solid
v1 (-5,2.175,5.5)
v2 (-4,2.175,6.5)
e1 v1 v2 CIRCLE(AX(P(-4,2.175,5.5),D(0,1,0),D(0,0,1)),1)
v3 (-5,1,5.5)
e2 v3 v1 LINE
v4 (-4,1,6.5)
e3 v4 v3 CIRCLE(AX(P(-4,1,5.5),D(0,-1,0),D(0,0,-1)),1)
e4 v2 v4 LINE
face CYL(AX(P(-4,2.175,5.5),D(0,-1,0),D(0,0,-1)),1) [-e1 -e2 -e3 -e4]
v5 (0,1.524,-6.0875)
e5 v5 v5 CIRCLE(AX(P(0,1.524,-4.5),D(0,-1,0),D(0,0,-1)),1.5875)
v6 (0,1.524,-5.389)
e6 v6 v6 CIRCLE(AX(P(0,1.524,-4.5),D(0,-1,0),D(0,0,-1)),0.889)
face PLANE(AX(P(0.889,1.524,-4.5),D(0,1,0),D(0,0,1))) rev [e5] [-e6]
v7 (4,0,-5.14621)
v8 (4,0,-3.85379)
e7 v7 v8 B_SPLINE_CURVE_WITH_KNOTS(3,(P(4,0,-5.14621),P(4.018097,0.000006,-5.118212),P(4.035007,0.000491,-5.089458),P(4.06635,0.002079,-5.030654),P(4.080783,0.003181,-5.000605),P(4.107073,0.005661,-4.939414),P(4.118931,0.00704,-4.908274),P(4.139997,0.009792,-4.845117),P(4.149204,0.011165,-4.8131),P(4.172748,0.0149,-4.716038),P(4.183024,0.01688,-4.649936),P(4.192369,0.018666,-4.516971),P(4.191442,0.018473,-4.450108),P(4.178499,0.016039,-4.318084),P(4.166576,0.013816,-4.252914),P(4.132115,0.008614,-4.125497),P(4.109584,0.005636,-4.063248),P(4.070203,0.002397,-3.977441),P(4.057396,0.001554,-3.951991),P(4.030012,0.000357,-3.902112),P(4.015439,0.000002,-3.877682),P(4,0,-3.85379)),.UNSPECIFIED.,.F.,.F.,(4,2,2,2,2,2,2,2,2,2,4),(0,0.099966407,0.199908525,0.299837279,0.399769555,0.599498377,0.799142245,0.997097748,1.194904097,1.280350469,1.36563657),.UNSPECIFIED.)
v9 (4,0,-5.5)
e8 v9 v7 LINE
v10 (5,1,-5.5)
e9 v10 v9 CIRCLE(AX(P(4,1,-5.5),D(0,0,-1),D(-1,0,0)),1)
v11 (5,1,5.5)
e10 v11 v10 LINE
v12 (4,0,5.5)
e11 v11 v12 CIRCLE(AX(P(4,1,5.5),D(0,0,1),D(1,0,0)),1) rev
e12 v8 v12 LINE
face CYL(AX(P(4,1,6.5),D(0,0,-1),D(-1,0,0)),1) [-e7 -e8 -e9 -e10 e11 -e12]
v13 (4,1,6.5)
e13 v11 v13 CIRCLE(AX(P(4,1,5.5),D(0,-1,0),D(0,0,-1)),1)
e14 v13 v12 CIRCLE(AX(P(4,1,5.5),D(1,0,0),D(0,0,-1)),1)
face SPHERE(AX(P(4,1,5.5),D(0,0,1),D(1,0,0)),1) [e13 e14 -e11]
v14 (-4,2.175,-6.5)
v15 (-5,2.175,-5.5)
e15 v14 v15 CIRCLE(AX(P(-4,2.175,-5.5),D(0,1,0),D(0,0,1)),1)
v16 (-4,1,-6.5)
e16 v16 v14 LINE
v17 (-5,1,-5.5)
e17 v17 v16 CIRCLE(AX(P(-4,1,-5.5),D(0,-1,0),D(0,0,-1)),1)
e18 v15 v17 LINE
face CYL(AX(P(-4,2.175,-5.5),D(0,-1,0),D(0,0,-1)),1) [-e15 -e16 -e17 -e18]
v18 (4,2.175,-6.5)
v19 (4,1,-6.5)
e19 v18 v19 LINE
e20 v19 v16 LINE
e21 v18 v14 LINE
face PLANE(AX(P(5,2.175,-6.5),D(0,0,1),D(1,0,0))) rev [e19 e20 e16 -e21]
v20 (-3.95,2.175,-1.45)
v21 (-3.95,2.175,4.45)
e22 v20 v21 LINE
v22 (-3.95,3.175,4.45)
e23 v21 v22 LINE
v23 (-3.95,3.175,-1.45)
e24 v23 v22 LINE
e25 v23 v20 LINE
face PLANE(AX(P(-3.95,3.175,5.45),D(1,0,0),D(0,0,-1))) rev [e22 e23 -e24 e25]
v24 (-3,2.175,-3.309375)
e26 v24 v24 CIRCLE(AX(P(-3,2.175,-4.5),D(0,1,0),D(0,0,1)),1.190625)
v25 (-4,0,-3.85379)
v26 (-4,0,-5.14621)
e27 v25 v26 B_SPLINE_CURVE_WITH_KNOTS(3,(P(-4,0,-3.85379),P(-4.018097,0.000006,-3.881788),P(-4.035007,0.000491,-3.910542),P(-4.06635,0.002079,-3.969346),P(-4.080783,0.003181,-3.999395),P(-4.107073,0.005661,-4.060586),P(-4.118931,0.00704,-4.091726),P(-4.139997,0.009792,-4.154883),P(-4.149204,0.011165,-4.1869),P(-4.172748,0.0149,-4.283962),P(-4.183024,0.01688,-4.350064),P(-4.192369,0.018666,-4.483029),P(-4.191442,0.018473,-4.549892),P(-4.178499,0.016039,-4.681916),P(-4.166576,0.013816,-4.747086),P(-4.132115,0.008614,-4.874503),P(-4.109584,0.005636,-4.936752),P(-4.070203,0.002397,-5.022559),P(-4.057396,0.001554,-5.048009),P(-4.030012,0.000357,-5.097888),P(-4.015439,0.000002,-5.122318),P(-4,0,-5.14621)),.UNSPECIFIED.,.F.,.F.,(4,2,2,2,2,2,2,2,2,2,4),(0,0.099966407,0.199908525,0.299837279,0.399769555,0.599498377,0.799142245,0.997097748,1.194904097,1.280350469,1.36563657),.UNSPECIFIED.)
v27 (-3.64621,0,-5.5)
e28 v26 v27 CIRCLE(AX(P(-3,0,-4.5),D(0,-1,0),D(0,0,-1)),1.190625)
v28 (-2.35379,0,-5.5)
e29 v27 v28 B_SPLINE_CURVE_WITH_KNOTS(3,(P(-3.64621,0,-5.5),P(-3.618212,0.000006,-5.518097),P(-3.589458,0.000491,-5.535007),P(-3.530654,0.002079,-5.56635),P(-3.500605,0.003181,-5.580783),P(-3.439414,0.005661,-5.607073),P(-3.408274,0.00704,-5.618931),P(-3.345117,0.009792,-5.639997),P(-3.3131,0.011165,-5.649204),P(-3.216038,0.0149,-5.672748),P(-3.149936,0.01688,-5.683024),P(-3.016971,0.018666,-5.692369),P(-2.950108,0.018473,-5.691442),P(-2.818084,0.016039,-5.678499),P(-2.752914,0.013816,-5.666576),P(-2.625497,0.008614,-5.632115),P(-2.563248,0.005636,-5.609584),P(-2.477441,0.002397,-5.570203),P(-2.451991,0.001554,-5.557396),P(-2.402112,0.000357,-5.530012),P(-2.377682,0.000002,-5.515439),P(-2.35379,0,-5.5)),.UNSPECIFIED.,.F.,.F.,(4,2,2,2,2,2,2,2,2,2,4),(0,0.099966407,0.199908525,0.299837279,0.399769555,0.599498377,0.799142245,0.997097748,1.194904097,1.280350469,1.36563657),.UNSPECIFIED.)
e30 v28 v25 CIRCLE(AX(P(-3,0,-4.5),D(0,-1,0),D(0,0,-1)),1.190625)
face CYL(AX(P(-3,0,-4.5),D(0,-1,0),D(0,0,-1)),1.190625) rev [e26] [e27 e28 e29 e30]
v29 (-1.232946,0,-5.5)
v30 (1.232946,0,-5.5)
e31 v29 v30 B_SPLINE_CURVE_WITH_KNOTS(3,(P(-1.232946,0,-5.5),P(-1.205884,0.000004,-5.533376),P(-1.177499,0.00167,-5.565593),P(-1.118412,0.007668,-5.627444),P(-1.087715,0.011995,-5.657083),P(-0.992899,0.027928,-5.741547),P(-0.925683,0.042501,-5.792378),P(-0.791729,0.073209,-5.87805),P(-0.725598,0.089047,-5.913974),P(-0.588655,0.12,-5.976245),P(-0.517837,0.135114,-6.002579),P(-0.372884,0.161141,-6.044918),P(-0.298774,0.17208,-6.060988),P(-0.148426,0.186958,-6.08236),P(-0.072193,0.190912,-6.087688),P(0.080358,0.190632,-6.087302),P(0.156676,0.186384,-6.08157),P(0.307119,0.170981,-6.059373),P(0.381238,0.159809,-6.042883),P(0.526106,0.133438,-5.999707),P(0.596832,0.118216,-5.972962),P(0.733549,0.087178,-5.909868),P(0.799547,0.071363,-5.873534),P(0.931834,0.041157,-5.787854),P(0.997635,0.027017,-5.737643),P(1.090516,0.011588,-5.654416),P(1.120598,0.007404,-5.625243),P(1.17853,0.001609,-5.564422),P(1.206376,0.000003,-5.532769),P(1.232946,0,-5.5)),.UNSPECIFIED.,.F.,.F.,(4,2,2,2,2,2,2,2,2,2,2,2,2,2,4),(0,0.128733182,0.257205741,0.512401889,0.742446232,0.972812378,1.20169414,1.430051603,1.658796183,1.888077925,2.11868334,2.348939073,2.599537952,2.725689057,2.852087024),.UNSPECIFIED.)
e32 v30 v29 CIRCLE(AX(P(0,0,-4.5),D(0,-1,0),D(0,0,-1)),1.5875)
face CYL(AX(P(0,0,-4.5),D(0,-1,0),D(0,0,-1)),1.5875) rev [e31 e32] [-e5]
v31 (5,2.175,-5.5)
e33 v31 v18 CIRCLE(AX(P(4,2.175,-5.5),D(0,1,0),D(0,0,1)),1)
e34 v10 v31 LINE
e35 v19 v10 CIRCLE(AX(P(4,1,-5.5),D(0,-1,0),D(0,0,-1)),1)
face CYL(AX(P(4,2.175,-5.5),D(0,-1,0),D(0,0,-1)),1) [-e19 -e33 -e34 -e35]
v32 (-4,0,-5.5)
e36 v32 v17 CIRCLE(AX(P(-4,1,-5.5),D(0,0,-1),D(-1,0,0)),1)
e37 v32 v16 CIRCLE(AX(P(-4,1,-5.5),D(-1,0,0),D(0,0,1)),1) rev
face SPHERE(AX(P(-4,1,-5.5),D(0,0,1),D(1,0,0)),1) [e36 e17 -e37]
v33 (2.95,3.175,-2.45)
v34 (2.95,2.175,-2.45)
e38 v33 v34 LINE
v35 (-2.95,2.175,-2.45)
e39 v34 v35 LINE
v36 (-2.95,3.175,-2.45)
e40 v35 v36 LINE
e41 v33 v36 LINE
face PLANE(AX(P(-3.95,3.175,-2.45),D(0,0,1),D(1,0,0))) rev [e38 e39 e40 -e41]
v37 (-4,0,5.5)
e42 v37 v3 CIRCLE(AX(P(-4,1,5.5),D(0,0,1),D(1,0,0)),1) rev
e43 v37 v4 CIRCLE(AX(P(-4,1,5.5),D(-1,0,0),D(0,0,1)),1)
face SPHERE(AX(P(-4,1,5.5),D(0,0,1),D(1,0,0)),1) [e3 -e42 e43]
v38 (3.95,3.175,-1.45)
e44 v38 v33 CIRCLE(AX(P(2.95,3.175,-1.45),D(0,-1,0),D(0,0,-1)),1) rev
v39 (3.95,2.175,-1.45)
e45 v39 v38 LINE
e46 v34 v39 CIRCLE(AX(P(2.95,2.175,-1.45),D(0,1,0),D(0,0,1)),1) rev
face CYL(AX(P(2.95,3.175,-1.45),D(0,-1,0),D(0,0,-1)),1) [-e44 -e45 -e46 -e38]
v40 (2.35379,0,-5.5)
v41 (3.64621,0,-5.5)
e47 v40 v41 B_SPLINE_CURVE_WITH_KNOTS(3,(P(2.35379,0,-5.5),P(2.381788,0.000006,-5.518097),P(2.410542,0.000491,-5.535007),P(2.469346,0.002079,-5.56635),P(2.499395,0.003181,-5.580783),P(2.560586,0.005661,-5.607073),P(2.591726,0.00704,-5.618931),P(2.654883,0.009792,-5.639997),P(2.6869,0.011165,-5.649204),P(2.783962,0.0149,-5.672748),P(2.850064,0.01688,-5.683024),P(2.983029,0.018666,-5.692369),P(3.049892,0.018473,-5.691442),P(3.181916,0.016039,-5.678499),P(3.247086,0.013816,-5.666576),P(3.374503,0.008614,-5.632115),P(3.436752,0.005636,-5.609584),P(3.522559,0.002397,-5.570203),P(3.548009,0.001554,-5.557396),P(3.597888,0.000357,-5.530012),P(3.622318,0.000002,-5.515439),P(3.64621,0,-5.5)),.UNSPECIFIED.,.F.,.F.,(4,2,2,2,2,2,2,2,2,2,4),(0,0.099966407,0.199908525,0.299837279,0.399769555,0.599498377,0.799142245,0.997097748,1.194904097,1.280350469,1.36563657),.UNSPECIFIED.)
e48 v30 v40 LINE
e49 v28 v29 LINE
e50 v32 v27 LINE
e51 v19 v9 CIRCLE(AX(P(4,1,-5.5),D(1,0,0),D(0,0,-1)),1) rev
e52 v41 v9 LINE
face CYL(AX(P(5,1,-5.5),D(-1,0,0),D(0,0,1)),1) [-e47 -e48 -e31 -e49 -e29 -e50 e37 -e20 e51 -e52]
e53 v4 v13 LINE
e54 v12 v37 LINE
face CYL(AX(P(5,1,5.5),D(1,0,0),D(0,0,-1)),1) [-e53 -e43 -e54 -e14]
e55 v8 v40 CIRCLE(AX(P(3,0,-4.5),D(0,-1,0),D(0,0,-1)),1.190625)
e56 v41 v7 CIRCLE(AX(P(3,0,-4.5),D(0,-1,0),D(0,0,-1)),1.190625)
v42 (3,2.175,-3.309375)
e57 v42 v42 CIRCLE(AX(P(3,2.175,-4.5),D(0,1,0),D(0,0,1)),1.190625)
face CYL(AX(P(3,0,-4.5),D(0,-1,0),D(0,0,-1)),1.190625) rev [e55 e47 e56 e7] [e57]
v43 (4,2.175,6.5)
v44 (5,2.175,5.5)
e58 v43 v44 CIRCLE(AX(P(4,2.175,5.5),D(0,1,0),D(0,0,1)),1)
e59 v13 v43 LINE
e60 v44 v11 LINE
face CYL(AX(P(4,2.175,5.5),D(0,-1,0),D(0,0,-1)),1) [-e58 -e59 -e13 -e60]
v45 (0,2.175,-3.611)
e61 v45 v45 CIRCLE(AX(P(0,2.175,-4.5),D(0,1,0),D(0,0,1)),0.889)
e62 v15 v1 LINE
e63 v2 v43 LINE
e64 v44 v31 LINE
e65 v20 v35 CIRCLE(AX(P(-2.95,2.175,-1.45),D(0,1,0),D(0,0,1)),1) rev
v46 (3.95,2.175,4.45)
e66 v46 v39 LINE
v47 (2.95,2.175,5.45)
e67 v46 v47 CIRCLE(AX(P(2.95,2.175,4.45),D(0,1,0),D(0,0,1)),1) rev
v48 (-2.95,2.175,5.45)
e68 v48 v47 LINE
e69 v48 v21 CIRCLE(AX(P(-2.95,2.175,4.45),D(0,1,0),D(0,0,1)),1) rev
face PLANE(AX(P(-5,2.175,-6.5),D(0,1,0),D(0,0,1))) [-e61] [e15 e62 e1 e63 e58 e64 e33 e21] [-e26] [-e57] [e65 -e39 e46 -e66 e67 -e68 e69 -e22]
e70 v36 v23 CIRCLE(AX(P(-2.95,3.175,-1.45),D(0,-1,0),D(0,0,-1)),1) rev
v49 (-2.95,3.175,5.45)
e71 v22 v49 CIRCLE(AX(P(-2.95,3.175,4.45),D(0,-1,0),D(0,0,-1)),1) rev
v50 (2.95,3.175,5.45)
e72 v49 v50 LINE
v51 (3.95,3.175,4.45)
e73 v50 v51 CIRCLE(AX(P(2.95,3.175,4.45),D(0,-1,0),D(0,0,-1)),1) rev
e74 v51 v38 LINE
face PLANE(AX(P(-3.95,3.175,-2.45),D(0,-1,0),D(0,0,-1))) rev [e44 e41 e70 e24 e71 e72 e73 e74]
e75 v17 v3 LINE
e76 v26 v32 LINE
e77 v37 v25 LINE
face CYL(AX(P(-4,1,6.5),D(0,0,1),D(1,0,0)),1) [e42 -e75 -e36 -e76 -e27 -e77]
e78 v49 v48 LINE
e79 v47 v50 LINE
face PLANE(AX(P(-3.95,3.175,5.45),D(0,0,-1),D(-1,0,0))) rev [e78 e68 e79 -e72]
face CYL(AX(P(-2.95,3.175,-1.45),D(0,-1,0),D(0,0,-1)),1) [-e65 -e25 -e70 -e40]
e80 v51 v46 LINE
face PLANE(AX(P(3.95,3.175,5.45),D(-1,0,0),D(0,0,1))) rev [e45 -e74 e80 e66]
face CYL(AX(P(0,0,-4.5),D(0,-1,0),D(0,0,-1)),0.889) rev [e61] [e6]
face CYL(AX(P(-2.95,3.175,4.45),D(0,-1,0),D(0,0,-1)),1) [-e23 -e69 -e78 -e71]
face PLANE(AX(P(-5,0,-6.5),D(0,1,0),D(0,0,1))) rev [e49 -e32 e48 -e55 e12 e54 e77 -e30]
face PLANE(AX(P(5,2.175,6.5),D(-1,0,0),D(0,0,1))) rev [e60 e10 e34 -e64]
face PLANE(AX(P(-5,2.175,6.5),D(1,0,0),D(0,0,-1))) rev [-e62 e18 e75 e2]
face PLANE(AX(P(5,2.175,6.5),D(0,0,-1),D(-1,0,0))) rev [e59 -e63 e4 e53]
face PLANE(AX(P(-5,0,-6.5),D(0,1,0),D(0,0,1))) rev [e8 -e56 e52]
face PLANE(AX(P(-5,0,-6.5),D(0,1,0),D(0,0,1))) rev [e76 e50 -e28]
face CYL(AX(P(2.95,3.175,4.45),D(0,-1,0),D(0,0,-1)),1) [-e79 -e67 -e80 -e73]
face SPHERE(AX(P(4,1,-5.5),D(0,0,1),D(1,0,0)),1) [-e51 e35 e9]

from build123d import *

# Parameters (mm, degrees)
SKETCH1_W                                      = 10
SKETCH1_H                                      = 13
EXTRUDE1_DEPTH                                 = 2.175
SKETCH3_W                                      = 7.9
SKETCH3_H                                      = 7.9
EXTRUDE3_DEPTH                                 = 1
CBORE_FOR_0_SOCKET_HEAD_CAP_SCREW1_D           = 1.778
CBORE_FOR_0_SOCKET_HEAD_CAP_SCREW1_CBORE_D     = 3.175
CBORE_FOR_0_SOCKET_HEAD_CAP_SCREW1_CBORE_DEPTH = 1.524
F_3_32_0_09375_DIAMETER_HOLE1_D                = 2.38125
F_3_32_0_09375_DIAMETER_HOLE1_DEPTH            = 10
F_3_32_0_09375_DIAMETER_HOLE1_TIP              = 0.715399675
FILLET3_R                                      = 1


with BuildPart() as part:
    # Sketch1 → Extrude1 (new body)
    with BuildSketch(Plane(origin=(0, 0, 0), x_dir=(1, 0, 0), z_dir=(0, 1, 0))):
        Rectangle(SKETCH1_W, SKETCH1_H)
    extrude(amount=EXTRUDE1_DEPTH)

    # Sketch3 → Extrude3 (add)
    with BuildSketch(Plane(origin=(0, 2.175, 0), x_dir=(1, 0, 0), z_dir=(0, 1, 0))):
        with Locations((0, -1.5)):
            Rectangle(SKETCH3_W, SKETCH3_H)
    extrude(amount=EXTRUDE3_DEPTH)

    # CBORE for #0 Socket Head Cap Screw1 (through all)
    with Locations(Plane(origin=(0, 0, -4.5), x_dir=(0, 0, -1), z_dir=(0, -1, 0))):
        with Locations((0, 0)):
            CounterBoreHole(CBORE_FOR_0_SOCKET_HEAD_CAP_SCREW1_D / 2, CBORE_FOR_0_SOCKET_HEAD_CAP_SCREW1_CBORE_D / 2, CBORE_FOR_0_SOCKET_HEAD_CAP_SCREW1_CBORE_DEPTH)

    # 3/32 (0.09375) Diameter Hole1
    with Locations(Plane(origin=(-3, 0, -4.5), x_dir=(0, 0, -1), z_dir=(0, -1, 0))):
        with Locations((0, 0), (0, 6)):
            Hole(F_3_32_0_09375_DIAMETER_HOLE1_D / 2, depth=F_3_32_0_09375_DIAMETER_HOLE1_DEPTH)
            with Locations((0, 0, -(F_3_32_0_09375_DIAMETER_HOLE1_DEPTH + F_3_32_0_09375_DIAMETER_HOLE1_TIP / 2))):  # 118° drill point
                Cone(0, F_3_32_0_09375_DIAMETER_HOLE1_D / 2, F_3_32_0_09375_DIAMETER_HOLE1_TIP, mode=Mode.SUBTRACT)

    # Fillet3
    # the kernel refuses this fillet: 1 mm, written as the material it takes off along each edge
    with BuildSketch(Plane(origin=(-4, 1, -5.5), x_dir=(0, -1, 0), z_dir=(-1, 0, 0))) as fillet3_piece_1_section:
        Polygon((0, 0), (FILLET3_R, 0), (FILLET3_R, -FILLET3_R), (0, -FILLET3_R), align=None)
    fillet3_piece_1 = extrude(amount=FILLET3_R, mode=Mode.PRIVATE)
    fillet3_piece_1 = fillet3_piece_1 - Plane(origin=(-4, 1, -5.5), x_dir=(0, 0.7071067811865475, 0.7071067811865475), z_dir=(-1, 0, 0)) * Sphere(FILLET3_R, mode=Mode.PRIVATE)
    add(fillet3_piece_1, mode=Mode.SUBTRACT)
    with BuildSketch(Plane(origin=(4, 1, -5.5), x_dir=(0, -1, 0), z_dir=(1, 0, 0))) as fillet3_piece_2_section:
        Polygon((0, 0), (FILLET3_R, 0), (FILLET3_R, FILLET3_R), (0, FILLET3_R), align=None)
    fillet3_piece_2 = extrude(amount=FILLET3_R, mode=Mode.PRIVATE)
    fillet3_piece_2 = fillet3_piece_2 - Plane(origin=(4, 1, -5.5), x_dir=(0, 0.7071067811865475, 0.7071067811865475), z_dir=(1, 0, 0)) * Sphere(FILLET3_R, mode=Mode.PRIVATE)
    add(fillet3_piece_2, mode=Mode.SUBTRACT)
    with BuildSketch(Plane(origin=(4, 1, 5.5), x_dir=(1, 0, 0), z_dir=(0, 0, 1))) as fillet3_piece_3_section:
        Polygon((0, 0), (FILLET3_R, 0), (FILLET3_R, -FILLET3_R), (0, -FILLET3_R), align=None)
    fillet3_piece_3 = extrude(amount=FILLET3_R, mode=Mode.PRIVATE)
    fillet3_piece_3 = fillet3_piece_3 - Plane(origin=(4, 1, 5.5), x_dir=(-0.7071067811865475, 0.7071067811865475, 0), z_dir=(0, 0, 1)) * Sphere(FILLET3_R, mode=Mode.PRIVATE)
    add(fillet3_piece_3, mode=Mode.SUBTRACT)
    with BuildSketch(Plane(origin=(-4, 1, 5.5), x_dir=(-1, 0, 0), z_dir=(0, 0, 1))) as fillet3_piece_4_section:
        Polygon((0, 0), (FILLET3_R, 0), (FILLET3_R, FILLET3_R), (0, FILLET3_R), align=None)
    fillet3_piece_4 = extrude(amount=FILLET3_R, mode=Mode.PRIVATE)
    fillet3_piece_4 = fillet3_piece_4 - Plane(origin=(-4, 1, 5.5), x_dir=(0.7071067811865475, 0.7071067811865475, 0), z_dir=(0, 0, 1)) * Sphere(FILLET3_R, mode=Mode.PRIVATE)
    add(fillet3_piece_4, mode=Mode.SUBTRACT)
    with BuildSketch(Plane(origin=(-3.95, 2.175, -2.45), x_dir=(0, 0, 1), z_dir=(0, 1, 0)), Plane(origin=(3.95, 2.175, -2.45), x_dir=(-1, 0, 0), z_dir=(0, 1, 0))) as fillet3_piece_5:
        with BuildLine():
            CenterArc((FILLET3_R, FILLET3_R), FILLET3_R, 180, 90)
            Line((0, FILLET3_R), (0, 0))
            Line((0, 0), (FILLET3_R, 0))
        make_face()
    extrude(amount=3.5, mode=Mode.SUBTRACT)
    with BuildSketch(Plane(origin=(-3.95, 2.175, 5.45), x_dir=(0, 0, -1), z_dir=(0, 1, 0)), Plane(origin=(3.95, 2.175, 5.45), x_dir=(-1, 0, 0), z_dir=(0, 1, 0))) as fillet3_piece_6:
        with BuildLine():
            CenterArc((FILLET3_R, -FILLET3_R), FILLET3_R, 90, 90)
            Line((0, -FILLET3_R), (0, 0))
            Line((0, 0), (FILLET3_R, 0))
        make_face()
    extrude(amount=3.5, mode=Mode.SUBTRACT)
    with BuildSketch(Plane(origin=(-4, 0, -6.5), x_dir=(0, 0, 1), z_dir=(1, 0, 0))) as fillet3_piece_7:
        with BuildLine():
            CenterArc((FILLET3_R, -FILLET3_R), FILLET3_R, 90, 90)
            Line((0, -FILLET3_R), (0, 0))
            Line((0, 0), (FILLET3_R, 0))
        make_face()
    extrude(amount=8, mode=Mode.SUBTRACT)
    with BuildSketch(Plane(origin=(5, 0, -5.5), x_dir=(0, 1, 0), z_dir=(0, 0, 1)), Plane(origin=(-5, 0, 5.5), x_dir=(0, 1, 0), z_dir=(0, 0, -1))) as fillet3_piece_8:
        with BuildLine():
            CenterArc((FILLET3_R, FILLET3_R), FILLET3_R, 180, 90)
            Line((0, FILLET3_R), (0, 0))
            Line((0, 0), (FILLET3_R, 0))
        make_face()
    extrude(amount=11, mode=Mode.SUBTRACT)
    with BuildSketch(Plane(origin=(4, 0, 6.5), x_dir=(0, 1, 0), z_dir=(-1, 0, 0))) as fillet3_piece_9:
        with BuildLine():
            CenterArc((FILLET3_R, FILLET3_R), FILLET3_R, 180, 90)
            Line((0, FILLET3_R), (0, 0))
            Line((0, 0), (FILLET3_R, 0))
        make_face()
    extrude(amount=8, mode=Mode.SUBTRACT)
    with BuildSketch(Plane(origin=(-5, 1, -6.5), x_dir=(0, 0, 1), z_dir=(0, 1, 0)), Plane(origin=(-5, 1, 6.5), x_dir=(1, 0, 0), z_dir=(0, 1, 0))) as fillet3_piece_10:
        with BuildLine():
            CenterArc((FILLET3_R, FILLET3_R), FILLET3_R, 180, 90)
            Line((0, FILLET3_R), (0, 0))
            Line((0, 0), (FILLET3_R, 0))
        make_face()
    extrude(amount=3.675, mode=Mode.SUBTRACT)
    with BuildSketch(Plane(origin=(5, 1, -6.5), x_dir=(0, 0, 1), z_dir=(0, 1, 0)), Plane(origin=(5, 1, 6.5), x_dir=(-1, 0, 0), z_dir=(0, 1, 0))) as fillet3_piece_11:
        with BuildLine():
            CenterArc((FILLET3_R, -FILLET3_R), FILLET3_R, 90, 90)
            Line((0, -FILLET3_R), (0, 0))
            Line((0, 0), (FILLET3_R, 0))
        make_face()
    extrude(amount=3.675, mode=Mode.SUBTRACT)


solid = part.part
